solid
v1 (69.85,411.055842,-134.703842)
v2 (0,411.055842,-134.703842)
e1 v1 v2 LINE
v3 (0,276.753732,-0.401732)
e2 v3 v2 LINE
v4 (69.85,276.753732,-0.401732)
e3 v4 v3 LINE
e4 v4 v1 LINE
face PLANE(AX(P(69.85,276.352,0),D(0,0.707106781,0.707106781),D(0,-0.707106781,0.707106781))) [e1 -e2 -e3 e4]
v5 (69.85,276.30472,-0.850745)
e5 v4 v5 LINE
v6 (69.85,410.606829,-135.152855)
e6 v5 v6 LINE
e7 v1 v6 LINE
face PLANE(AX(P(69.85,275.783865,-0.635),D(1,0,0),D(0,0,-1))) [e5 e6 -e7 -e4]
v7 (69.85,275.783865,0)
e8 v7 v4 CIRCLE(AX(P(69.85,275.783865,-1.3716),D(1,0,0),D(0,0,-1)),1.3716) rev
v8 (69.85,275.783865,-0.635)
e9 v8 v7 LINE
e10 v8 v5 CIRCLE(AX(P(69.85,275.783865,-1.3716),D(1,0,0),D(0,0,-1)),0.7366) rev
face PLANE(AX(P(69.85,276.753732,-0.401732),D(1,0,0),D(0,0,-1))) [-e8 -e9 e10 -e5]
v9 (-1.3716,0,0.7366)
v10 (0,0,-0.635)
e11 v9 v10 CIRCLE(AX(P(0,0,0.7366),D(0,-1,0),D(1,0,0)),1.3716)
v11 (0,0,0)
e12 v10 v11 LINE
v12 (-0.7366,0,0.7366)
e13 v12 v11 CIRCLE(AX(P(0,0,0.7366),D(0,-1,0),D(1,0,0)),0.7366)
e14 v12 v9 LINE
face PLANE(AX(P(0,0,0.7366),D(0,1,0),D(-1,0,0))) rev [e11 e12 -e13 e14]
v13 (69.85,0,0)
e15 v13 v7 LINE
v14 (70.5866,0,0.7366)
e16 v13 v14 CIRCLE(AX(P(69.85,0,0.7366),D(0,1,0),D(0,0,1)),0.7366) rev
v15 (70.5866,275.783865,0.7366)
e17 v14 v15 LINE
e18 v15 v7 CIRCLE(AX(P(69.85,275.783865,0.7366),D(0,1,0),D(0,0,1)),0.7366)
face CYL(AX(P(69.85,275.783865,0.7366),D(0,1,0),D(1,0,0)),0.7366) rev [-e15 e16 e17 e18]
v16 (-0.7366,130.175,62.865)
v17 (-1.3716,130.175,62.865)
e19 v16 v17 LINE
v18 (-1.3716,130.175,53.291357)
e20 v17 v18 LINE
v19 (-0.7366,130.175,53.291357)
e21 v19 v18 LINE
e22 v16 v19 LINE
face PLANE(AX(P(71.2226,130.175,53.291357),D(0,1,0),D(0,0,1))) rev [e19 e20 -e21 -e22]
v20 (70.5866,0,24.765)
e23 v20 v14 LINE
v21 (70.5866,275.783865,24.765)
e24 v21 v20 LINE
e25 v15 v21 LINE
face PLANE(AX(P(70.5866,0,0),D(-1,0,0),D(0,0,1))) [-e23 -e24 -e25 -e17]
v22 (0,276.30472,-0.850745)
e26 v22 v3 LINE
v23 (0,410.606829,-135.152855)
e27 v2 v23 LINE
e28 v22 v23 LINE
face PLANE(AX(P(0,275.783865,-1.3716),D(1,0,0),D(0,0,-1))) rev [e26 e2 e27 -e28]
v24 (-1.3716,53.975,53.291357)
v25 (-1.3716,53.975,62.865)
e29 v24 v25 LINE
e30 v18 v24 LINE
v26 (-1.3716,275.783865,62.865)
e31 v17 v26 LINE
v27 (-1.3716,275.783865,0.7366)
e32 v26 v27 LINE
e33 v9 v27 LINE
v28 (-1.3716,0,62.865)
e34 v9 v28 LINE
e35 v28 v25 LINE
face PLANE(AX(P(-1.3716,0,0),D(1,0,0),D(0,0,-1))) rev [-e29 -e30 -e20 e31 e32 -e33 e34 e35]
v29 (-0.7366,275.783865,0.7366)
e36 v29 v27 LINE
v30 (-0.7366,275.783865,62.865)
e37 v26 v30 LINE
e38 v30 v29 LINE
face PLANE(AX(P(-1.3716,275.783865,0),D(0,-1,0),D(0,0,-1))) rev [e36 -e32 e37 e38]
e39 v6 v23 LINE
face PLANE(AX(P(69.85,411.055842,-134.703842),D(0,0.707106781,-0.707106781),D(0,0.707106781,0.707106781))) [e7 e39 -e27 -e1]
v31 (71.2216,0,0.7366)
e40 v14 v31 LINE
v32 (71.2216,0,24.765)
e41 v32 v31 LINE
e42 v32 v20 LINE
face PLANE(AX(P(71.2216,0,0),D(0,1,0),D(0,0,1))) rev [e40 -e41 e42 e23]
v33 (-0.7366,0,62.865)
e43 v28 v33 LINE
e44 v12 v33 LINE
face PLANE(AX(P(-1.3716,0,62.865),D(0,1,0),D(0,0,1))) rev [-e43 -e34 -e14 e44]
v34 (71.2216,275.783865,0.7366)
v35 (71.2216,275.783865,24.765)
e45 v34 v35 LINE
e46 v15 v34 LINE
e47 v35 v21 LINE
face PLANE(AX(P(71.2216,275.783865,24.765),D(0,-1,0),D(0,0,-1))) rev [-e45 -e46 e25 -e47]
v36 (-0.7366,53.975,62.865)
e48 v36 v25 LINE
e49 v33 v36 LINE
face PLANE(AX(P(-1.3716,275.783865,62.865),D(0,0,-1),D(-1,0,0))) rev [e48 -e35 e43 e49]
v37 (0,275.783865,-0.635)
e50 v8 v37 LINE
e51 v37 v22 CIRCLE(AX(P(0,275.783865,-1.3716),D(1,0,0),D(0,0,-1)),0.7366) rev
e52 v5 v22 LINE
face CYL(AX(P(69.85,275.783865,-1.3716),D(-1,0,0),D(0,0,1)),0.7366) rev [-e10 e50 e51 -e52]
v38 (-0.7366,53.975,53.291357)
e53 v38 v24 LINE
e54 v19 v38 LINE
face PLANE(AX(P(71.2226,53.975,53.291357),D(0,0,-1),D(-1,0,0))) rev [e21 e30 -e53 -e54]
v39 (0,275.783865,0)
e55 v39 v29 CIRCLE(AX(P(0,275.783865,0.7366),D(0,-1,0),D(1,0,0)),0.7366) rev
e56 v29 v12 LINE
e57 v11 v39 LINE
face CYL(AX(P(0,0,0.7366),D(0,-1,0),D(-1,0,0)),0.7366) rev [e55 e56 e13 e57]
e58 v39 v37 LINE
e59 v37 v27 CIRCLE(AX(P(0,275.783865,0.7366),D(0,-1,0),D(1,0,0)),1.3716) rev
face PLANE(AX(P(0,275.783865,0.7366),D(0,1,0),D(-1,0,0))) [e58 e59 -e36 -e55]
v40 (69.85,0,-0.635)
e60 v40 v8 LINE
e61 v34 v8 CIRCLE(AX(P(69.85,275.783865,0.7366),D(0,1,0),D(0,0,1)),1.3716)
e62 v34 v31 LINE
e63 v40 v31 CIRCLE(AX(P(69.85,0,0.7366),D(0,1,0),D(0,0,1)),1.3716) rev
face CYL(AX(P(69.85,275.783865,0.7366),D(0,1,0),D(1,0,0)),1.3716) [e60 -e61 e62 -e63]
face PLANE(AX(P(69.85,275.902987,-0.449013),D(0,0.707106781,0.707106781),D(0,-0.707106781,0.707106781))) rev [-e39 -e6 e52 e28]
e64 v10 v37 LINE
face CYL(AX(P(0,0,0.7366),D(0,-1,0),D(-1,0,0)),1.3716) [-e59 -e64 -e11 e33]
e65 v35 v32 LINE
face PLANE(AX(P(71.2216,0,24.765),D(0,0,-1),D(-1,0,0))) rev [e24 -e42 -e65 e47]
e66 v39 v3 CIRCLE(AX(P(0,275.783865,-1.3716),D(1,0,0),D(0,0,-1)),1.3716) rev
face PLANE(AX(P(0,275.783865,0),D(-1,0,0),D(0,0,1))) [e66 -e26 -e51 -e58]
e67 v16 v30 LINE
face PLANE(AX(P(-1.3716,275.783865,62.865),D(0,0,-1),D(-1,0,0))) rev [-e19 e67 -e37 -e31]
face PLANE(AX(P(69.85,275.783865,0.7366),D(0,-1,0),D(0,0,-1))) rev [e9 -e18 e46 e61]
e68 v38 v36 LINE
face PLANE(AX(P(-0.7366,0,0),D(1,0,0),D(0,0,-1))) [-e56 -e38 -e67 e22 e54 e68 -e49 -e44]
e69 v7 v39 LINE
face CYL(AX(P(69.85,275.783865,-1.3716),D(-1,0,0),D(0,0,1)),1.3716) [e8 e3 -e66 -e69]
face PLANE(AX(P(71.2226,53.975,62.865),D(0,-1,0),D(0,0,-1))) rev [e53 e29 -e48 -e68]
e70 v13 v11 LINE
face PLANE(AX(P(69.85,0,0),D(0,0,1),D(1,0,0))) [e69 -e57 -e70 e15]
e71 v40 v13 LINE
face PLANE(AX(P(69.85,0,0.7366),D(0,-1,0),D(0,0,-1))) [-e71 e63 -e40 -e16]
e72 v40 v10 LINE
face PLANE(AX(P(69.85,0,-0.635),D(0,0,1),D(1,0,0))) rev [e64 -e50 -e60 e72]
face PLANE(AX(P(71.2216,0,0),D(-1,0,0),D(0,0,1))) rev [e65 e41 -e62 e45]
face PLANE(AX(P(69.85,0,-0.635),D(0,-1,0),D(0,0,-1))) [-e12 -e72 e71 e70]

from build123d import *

# Parameters (mm, degrees)
BASE_FLANGE1_DEPTH = 69.85
EDGE_FLANGE1_DEPTH = 275.783864678
EDGE_FLANGE2_DEPTH = 275.783864678
CUT_EXTRUDE1_REACH = 440.752
SKETCH12_W         = 9.573642834
SKETCH12_H         = 76.2


# Sheet-metal steps are written as plain solids
with BuildPart() as part:
    # Sketch1 → Base-Flange1 (new body)
    with BuildSketch(Plane(origin=(0, 0, 0), x_dir=(0, 0, -1), z_dir=(1, 0, 0))):
        with BuildLine():
            Line((0, 0), (0, 275.783864678))
            ThreePointArc((0, 275.783864678), (0.104406833, 276.308753274), (0.401732339, 276.753732339))
            Line((0.401732339, 276.753732339), (134.703841816, 411.055841816))
            Line((134.703841816, 411.055841816), (135.152854622, 410.60682901))
            Line((135.152854622, 410.60682901), (0.850745145, 276.304719533))
            ThreePointArc((0.850745145, 276.304719533), (0.691070336, 276.065749294), (0.635, 275.783864678))
            Line((0.635, 275.783864678), (0.635, 0))
            Line((0.635, 0), (0, 0))
        make_face()
    extrude(amount=BASE_FLANGE1_DEPTH)

    # Edge-Flange1 section (across the edge) → Edge-Flange1 (add)
    with BuildSketch(Plane(origin=(-0.7366, 275.783864678, 0), x_dir=(1, 0, 0), z_dir=(0, -1, 0))):
        with BuildLine():
            Line((-0.635, 0.7366), (-0.635, 62.865))
            Line((-0.635, 62.865), (0, 62.865))
            Line((0, 62.865), (0, 0.7366))
            ThreePointArc((0, 0.7366), (0.215745145, 0.215745145), (0.7366, 0))
            Line((0.7366, 0), (0.7366, -0.635))
            ThreePointArc((0.7366, -0.635), (-0.233267661, -0.233267661), (-0.635, 0.7366))
        make_face()
    extrude(amount=EDGE_FLANGE1_DEPTH)

    # Edge-Flange2 section (across the edge) → Edge-Flange2 (add)
    with BuildSketch(Plane(origin=(70.5866, 0, 0), x_dir=(-1, 0, 0), z_dir=(0, 1, 0))):
        with BuildLine():
            Line((-0.635, 0.7366), (-0.635, 24.765))
            Line((-0.635, 24.765), (0, 24.765))
            Line((0, 24.765), (0, 0.7366))
            ThreePointArc((0, 0.7366), (0.215745145, 0.215745145), (0.7366, 0))
            Line((0.7366, 0), (0.7366, -0.635))
            ThreePointArc((0.7366, -0.635), (-0.233267661, -0.233267661), (-0.635, 0.7366))
        make_face()
    extrude(amount=EDGE_FLANGE2_DEPTH)

    # Sketch12 → Cut-Extrude1 (cut, up to next)
    with BuildSketch(Plane.ZY.offset(1.3716), mode=Mode.PRIVATE) as cut_extrude1_sk1:
        with Locations((58.078178583, 92.075)):
            Rectangle(SKETCH12_W, SKETCH12_H)
    cut_extrude1_tool1 = extrude(cut_extrude1_sk1.sketch, amount=-CUT_EXTRUDE1_REACH, mode=Mode.PRIVATE) & part.part
    add(cut_extrude1_tool1.solids().sort_by_distance((-1.3716, 92.075, 58.078179))[0], mode=Mode.SUBTRACT)


solid = part.part
